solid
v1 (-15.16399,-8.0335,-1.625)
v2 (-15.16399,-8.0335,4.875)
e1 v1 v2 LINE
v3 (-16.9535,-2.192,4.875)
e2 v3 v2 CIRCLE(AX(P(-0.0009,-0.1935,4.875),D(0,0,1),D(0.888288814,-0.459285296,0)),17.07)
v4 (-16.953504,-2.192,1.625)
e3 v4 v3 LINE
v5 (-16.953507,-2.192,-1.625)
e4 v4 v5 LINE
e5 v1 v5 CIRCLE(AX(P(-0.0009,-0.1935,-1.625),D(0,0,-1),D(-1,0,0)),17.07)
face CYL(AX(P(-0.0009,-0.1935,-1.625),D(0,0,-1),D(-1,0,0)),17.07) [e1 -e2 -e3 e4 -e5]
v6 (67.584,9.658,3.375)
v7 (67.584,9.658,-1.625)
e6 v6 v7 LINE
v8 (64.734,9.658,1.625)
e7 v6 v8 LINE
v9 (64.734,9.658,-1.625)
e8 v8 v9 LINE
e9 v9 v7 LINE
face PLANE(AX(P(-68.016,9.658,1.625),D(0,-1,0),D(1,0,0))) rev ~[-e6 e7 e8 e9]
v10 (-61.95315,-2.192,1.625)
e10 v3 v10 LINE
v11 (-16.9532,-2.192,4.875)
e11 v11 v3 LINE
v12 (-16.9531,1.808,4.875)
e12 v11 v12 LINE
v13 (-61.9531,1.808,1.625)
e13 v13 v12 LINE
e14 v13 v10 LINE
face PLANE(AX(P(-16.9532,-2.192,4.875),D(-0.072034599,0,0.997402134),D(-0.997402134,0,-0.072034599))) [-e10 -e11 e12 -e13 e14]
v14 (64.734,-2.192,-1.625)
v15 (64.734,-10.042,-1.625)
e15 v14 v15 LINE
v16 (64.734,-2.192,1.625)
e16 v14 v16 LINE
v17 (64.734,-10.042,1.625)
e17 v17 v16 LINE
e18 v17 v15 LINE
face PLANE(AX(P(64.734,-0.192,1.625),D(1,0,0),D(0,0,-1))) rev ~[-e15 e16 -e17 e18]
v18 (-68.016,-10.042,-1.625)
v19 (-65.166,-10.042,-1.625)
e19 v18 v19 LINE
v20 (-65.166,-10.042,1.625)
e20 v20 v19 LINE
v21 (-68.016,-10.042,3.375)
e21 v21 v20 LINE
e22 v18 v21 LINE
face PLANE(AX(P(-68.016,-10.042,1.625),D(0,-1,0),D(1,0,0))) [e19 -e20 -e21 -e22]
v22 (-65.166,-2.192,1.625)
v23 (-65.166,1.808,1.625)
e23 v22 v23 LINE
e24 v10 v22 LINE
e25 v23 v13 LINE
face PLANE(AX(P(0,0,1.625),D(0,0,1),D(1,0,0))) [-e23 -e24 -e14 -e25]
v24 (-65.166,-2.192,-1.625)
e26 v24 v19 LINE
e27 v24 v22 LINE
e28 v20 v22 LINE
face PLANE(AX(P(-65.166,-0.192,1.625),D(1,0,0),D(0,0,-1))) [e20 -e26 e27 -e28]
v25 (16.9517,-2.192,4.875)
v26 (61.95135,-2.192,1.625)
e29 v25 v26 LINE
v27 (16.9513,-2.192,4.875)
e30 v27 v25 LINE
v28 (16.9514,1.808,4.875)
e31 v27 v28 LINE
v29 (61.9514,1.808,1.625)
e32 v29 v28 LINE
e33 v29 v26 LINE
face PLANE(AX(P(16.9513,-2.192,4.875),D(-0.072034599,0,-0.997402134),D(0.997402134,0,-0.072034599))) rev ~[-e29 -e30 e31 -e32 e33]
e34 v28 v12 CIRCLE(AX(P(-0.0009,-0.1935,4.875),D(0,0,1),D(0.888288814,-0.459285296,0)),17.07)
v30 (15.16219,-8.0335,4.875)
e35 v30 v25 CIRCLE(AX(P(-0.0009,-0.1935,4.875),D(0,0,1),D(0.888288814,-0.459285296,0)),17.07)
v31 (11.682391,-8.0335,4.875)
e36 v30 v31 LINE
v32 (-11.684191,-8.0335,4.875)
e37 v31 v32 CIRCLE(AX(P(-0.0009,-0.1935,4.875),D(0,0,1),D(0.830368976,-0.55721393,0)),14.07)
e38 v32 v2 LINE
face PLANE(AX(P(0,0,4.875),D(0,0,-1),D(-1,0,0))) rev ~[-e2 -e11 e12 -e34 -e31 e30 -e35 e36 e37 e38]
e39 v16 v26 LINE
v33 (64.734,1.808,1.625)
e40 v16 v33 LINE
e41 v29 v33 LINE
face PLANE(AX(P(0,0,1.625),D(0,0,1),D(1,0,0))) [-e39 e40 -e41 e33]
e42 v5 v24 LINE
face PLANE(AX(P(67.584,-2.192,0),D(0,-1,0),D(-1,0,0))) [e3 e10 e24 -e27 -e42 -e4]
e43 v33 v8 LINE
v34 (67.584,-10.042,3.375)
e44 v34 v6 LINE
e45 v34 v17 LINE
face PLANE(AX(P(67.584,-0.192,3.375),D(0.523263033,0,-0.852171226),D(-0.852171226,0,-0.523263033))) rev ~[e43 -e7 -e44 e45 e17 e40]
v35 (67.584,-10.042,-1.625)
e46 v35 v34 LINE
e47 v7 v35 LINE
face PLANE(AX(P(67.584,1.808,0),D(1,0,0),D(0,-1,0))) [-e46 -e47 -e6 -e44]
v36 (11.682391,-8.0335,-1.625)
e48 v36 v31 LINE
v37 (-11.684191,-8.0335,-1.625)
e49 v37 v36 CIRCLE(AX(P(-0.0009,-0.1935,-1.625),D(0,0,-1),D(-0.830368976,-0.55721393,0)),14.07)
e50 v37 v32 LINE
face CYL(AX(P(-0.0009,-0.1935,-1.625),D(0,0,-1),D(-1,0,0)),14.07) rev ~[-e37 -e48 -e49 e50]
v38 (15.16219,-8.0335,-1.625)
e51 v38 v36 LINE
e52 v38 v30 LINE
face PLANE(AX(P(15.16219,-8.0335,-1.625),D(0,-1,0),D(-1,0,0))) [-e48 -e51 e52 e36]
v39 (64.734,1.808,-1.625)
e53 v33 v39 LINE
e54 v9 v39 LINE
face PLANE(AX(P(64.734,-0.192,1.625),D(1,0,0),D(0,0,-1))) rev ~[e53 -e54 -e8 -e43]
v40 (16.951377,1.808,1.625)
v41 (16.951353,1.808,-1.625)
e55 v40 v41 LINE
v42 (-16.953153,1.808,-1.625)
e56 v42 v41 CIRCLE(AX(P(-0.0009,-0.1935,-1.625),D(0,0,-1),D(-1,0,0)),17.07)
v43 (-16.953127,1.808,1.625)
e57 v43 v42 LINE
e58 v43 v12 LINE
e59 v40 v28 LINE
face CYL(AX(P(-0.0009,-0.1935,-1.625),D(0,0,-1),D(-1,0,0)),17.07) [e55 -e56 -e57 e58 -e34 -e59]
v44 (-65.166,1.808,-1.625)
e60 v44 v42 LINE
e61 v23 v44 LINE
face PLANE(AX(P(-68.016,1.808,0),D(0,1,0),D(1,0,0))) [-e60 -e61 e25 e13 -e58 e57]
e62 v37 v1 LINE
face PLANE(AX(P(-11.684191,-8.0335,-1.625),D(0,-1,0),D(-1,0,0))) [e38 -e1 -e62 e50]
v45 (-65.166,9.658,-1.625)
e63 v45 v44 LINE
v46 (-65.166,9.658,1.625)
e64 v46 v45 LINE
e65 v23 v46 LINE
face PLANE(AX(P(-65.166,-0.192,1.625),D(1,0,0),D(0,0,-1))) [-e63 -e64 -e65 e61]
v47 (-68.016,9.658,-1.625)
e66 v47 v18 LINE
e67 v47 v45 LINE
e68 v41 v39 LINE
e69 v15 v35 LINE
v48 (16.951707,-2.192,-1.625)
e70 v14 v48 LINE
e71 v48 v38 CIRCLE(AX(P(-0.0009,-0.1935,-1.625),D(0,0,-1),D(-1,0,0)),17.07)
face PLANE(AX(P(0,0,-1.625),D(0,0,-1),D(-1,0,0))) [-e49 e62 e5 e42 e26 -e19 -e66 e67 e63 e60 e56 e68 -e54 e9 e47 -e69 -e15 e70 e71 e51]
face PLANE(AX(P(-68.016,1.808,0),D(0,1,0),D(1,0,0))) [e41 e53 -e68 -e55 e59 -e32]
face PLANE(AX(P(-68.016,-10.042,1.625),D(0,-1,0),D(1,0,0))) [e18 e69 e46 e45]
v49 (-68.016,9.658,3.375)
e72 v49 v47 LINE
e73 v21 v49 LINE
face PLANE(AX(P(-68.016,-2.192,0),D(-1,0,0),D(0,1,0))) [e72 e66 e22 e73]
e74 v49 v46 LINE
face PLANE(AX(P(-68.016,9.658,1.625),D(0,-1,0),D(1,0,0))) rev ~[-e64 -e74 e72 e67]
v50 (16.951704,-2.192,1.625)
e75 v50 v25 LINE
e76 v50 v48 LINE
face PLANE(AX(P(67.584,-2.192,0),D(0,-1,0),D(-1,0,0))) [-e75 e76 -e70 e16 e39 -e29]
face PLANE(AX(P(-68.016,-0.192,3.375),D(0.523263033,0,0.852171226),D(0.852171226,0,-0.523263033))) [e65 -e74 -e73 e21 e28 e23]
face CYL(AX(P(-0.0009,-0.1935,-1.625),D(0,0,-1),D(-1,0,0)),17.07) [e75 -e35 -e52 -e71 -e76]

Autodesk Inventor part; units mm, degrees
ref_plane "YZ Plane" through (0, 0, 0) normal (1, 0, 0) x (0, 1, 0)
ref_plane "XZ Plane" through (0, 0, 0) normal (0, 1, 0) x (-1, 0, 0)
ref_plane "XY Plane" through (0, 0, 0) normal (0, 0, 1) x (1, 0, 0)
sketch "Skizze1" plane through (0, 0, 0) normal (0, 0, 1) x (1, 0, 0)
  line L0 (-68.016, 1.808) -> (67.584, 1.808)
  line L1 (67.584, 1.808) -> (67.584, -2.192)
  line L2 (67.584, -2.192) -> (-68.016, -2.192)
  line L3 (-68.016, -2.192) -> (-68.016, 1.808)
  line L4 (-68.016, 1.808) -> (67.584, -2.192) construction
  line L5 (67.584, 1.808) -> (-68.016, -2.192) construction
  point P0 (0, 0)
  point P1 (-0.216, -0.192)
  point P2 (-0.216, -0.192)
  dimension "d0" = 135.6
  dimension "d1" = 4
extrude "Extrusion1" add sketch "Skizze1" along normal mid plane 3.25
ref_plane "Arbeitsebene1" through (-68.016, -0.192, 1.625) normal (0, -1, 0) x (1, 0, 0)
sketch "Skizze2" plane through (-68.016, -0.192, 1.625) normal (0, -1, 0) x (1, 0, 0)
  line L0 (0, -3.25) -> (0, 0) projected
  line L1 (0, -3.25) -> (135.6, -3.25) projected
  line L2 (0, 0) -> (2.85, 0)
  line L3 (2.85, 0) -> (2.85, -3.25)
  line L4 (2.85, -3.25) -> (0, -3.25)
  line L5 (0, -3.25) -> (0, 0)
  line L6 (0, 0) -> (0, 1.75)
  line L7 (0, 1.75) -> (2.85, 0)
  line L8 (135.6, -3.25) -> (135.6, 0) projected
  line L9 (135.6, 0) -> (132.75, 0)
  line L10 (132.75, 0) -> (132.75, -3.25)
  line L11 (132.75, -3.25) -> (135.6, -3.25)
  line L12 (135.6, -3.25) -> (135.6, 0)
  line L13 (135.6, 0) -> (135.6, 1.75)
  line L14 (135.6, 1.75) -> (132.75, 0)
  point P0 (68.016, -1.625)
  dimension "d4" = 2.85
  dimension "d5" = 1.75
  dimension "d6" = 2.85
extrude "Extrusion2" add sketch "Skizze2" along normal mid plane 19.7
sketch "Skizze3" plane through (0, 0, 1.625) normal (0, 0, 1) x (1, 0, 0)
  circle A0 centre (0, 0) radius 16
  dimension "d9" = 32
extrude "Extrusion3" cut sketch "Skizze3" against normal through all
sketch "Skizze4" plane through (0, 0, -1.625) normal (0, 0, -1) x (-1, 0, 0)
  line L0 (0.0777, -0.1628) -> (6.2277, -0.1628) construction
  circle A0 centre (0.0009, -0.1935) radius 14.07
  circle A1 centre (0.0009, -0.1935) radius 17.07
  line L1 (-24.5991, -8.0335) -> (24.6009, -8.0335)
  point P0 (-17.0691, -0.1935)
  point P1 (17.0709, -0.1935)
  point P2 (11.6842, -8.0335)
  point P3 (15.164, -8.0335)
  point P4 (-15.1622, -8.0335)
  point P5 (-11.6824, -8.0335)
  dimension "d27" = 3
  dimension "d28" = 28.14
  dimension "d29" = 7.84
extrude "Extrusion4" add sketch "Skizze4" against normal blind 6.5 contours A0 L1 A1 picked at (15.9061, 1.1659)
sketch "Skizze7" plane through (0, 0, 1.625) normal (0, 0, 1) x (1, 0, 0)
  line L0 (-65.166, 1.808) -> (-16.9531, 1.808) projected
  line L1 (-16.9535, -2.192) -> (-65.166, -2.192) projected
  line L2 (-16.9531, 1.808) -> (-61.9531, 1.808)
  line L3 (-61.9531, 1.808) -> (-61.9531, -2.192)
  line L4 (-61.9531, -2.192) -> (-16.9531, -2.192)
  line L5 (-16.9531, -2.192) -> (-16.9531, 1.808)
  line L6 (16.9514, 1.808) -> (64.734, 1.808) projected
  line L7 (64.734, -2.192) -> (16.9517, -2.192) projected
  line L8 (16.9514, 1.808) -> (61.9514, 1.808)
  line L9 (61.9514, 1.808) -> (61.9514, -2.192)
  line L10 (61.9514, -2.192) -> (16.9514, -2.192)
  line L11 (16.9514, -2.192) -> (16.9514, 1.808)
  point P0 (0, 0)
  point P1 (16.9517, -2.192)
  dimension "d30" = 45
  dimension "d31" = 45
extrude "Extrusion7" add sketch "Skizze7" along normal blind 3.25
sketch "Skizze8" plane through (-65.166, -2.192, -1.625) normal (0, -1, 0) x (1, 0, 0)
  line L0 (48.2128, 6.5) -> (3.2128, 6.5) projected
  line L1 (48.2128, 6.5) -> (48.2128, 0) projected
  line L2 (3.2128, 6.5) -> (48.2128, 6.5)
  line L3 (48.2128, 6.5) -> (48.2128, 3.25)
  line L4 (48.2128, 3.25) -> (3.2128, 3.25)
  line L5 (3.2128, 3.25) -> (3.2128, 6.5)
  line L6 (127.1173, 3.25) -> (127.1173, 6.5) projected
  line L7 (82.1173, 6.5) -> (82.1173, 0) projected
  line L8 (127.1173, 6.5) -> (82.1173, 6.5)
  line L9 (82.1173, 6.5) -> (82.1173, 3.25)
  line L10 (82.1173, 3.25) -> (127.1173, 3.25)
  line L11 (127.1173, 3.25) -> (127.1173, 6.5)
  line L12 (82.1173, 6.5) -> (127.1173, 3.25)
  line L13 (50.002, 6.5) -> (48.2125, 6.5) projected
  line L14 (48.2125, 6.5) -> (3.2128, 3.25)
  point P0 (65.166, 1.625)
extrude "Extrusion8" cut sketch "Skizze8" against normal through all contours L14 L5 L0 | L12 L8 L6
properties part number "2024_08_23_Holder_GL25"
